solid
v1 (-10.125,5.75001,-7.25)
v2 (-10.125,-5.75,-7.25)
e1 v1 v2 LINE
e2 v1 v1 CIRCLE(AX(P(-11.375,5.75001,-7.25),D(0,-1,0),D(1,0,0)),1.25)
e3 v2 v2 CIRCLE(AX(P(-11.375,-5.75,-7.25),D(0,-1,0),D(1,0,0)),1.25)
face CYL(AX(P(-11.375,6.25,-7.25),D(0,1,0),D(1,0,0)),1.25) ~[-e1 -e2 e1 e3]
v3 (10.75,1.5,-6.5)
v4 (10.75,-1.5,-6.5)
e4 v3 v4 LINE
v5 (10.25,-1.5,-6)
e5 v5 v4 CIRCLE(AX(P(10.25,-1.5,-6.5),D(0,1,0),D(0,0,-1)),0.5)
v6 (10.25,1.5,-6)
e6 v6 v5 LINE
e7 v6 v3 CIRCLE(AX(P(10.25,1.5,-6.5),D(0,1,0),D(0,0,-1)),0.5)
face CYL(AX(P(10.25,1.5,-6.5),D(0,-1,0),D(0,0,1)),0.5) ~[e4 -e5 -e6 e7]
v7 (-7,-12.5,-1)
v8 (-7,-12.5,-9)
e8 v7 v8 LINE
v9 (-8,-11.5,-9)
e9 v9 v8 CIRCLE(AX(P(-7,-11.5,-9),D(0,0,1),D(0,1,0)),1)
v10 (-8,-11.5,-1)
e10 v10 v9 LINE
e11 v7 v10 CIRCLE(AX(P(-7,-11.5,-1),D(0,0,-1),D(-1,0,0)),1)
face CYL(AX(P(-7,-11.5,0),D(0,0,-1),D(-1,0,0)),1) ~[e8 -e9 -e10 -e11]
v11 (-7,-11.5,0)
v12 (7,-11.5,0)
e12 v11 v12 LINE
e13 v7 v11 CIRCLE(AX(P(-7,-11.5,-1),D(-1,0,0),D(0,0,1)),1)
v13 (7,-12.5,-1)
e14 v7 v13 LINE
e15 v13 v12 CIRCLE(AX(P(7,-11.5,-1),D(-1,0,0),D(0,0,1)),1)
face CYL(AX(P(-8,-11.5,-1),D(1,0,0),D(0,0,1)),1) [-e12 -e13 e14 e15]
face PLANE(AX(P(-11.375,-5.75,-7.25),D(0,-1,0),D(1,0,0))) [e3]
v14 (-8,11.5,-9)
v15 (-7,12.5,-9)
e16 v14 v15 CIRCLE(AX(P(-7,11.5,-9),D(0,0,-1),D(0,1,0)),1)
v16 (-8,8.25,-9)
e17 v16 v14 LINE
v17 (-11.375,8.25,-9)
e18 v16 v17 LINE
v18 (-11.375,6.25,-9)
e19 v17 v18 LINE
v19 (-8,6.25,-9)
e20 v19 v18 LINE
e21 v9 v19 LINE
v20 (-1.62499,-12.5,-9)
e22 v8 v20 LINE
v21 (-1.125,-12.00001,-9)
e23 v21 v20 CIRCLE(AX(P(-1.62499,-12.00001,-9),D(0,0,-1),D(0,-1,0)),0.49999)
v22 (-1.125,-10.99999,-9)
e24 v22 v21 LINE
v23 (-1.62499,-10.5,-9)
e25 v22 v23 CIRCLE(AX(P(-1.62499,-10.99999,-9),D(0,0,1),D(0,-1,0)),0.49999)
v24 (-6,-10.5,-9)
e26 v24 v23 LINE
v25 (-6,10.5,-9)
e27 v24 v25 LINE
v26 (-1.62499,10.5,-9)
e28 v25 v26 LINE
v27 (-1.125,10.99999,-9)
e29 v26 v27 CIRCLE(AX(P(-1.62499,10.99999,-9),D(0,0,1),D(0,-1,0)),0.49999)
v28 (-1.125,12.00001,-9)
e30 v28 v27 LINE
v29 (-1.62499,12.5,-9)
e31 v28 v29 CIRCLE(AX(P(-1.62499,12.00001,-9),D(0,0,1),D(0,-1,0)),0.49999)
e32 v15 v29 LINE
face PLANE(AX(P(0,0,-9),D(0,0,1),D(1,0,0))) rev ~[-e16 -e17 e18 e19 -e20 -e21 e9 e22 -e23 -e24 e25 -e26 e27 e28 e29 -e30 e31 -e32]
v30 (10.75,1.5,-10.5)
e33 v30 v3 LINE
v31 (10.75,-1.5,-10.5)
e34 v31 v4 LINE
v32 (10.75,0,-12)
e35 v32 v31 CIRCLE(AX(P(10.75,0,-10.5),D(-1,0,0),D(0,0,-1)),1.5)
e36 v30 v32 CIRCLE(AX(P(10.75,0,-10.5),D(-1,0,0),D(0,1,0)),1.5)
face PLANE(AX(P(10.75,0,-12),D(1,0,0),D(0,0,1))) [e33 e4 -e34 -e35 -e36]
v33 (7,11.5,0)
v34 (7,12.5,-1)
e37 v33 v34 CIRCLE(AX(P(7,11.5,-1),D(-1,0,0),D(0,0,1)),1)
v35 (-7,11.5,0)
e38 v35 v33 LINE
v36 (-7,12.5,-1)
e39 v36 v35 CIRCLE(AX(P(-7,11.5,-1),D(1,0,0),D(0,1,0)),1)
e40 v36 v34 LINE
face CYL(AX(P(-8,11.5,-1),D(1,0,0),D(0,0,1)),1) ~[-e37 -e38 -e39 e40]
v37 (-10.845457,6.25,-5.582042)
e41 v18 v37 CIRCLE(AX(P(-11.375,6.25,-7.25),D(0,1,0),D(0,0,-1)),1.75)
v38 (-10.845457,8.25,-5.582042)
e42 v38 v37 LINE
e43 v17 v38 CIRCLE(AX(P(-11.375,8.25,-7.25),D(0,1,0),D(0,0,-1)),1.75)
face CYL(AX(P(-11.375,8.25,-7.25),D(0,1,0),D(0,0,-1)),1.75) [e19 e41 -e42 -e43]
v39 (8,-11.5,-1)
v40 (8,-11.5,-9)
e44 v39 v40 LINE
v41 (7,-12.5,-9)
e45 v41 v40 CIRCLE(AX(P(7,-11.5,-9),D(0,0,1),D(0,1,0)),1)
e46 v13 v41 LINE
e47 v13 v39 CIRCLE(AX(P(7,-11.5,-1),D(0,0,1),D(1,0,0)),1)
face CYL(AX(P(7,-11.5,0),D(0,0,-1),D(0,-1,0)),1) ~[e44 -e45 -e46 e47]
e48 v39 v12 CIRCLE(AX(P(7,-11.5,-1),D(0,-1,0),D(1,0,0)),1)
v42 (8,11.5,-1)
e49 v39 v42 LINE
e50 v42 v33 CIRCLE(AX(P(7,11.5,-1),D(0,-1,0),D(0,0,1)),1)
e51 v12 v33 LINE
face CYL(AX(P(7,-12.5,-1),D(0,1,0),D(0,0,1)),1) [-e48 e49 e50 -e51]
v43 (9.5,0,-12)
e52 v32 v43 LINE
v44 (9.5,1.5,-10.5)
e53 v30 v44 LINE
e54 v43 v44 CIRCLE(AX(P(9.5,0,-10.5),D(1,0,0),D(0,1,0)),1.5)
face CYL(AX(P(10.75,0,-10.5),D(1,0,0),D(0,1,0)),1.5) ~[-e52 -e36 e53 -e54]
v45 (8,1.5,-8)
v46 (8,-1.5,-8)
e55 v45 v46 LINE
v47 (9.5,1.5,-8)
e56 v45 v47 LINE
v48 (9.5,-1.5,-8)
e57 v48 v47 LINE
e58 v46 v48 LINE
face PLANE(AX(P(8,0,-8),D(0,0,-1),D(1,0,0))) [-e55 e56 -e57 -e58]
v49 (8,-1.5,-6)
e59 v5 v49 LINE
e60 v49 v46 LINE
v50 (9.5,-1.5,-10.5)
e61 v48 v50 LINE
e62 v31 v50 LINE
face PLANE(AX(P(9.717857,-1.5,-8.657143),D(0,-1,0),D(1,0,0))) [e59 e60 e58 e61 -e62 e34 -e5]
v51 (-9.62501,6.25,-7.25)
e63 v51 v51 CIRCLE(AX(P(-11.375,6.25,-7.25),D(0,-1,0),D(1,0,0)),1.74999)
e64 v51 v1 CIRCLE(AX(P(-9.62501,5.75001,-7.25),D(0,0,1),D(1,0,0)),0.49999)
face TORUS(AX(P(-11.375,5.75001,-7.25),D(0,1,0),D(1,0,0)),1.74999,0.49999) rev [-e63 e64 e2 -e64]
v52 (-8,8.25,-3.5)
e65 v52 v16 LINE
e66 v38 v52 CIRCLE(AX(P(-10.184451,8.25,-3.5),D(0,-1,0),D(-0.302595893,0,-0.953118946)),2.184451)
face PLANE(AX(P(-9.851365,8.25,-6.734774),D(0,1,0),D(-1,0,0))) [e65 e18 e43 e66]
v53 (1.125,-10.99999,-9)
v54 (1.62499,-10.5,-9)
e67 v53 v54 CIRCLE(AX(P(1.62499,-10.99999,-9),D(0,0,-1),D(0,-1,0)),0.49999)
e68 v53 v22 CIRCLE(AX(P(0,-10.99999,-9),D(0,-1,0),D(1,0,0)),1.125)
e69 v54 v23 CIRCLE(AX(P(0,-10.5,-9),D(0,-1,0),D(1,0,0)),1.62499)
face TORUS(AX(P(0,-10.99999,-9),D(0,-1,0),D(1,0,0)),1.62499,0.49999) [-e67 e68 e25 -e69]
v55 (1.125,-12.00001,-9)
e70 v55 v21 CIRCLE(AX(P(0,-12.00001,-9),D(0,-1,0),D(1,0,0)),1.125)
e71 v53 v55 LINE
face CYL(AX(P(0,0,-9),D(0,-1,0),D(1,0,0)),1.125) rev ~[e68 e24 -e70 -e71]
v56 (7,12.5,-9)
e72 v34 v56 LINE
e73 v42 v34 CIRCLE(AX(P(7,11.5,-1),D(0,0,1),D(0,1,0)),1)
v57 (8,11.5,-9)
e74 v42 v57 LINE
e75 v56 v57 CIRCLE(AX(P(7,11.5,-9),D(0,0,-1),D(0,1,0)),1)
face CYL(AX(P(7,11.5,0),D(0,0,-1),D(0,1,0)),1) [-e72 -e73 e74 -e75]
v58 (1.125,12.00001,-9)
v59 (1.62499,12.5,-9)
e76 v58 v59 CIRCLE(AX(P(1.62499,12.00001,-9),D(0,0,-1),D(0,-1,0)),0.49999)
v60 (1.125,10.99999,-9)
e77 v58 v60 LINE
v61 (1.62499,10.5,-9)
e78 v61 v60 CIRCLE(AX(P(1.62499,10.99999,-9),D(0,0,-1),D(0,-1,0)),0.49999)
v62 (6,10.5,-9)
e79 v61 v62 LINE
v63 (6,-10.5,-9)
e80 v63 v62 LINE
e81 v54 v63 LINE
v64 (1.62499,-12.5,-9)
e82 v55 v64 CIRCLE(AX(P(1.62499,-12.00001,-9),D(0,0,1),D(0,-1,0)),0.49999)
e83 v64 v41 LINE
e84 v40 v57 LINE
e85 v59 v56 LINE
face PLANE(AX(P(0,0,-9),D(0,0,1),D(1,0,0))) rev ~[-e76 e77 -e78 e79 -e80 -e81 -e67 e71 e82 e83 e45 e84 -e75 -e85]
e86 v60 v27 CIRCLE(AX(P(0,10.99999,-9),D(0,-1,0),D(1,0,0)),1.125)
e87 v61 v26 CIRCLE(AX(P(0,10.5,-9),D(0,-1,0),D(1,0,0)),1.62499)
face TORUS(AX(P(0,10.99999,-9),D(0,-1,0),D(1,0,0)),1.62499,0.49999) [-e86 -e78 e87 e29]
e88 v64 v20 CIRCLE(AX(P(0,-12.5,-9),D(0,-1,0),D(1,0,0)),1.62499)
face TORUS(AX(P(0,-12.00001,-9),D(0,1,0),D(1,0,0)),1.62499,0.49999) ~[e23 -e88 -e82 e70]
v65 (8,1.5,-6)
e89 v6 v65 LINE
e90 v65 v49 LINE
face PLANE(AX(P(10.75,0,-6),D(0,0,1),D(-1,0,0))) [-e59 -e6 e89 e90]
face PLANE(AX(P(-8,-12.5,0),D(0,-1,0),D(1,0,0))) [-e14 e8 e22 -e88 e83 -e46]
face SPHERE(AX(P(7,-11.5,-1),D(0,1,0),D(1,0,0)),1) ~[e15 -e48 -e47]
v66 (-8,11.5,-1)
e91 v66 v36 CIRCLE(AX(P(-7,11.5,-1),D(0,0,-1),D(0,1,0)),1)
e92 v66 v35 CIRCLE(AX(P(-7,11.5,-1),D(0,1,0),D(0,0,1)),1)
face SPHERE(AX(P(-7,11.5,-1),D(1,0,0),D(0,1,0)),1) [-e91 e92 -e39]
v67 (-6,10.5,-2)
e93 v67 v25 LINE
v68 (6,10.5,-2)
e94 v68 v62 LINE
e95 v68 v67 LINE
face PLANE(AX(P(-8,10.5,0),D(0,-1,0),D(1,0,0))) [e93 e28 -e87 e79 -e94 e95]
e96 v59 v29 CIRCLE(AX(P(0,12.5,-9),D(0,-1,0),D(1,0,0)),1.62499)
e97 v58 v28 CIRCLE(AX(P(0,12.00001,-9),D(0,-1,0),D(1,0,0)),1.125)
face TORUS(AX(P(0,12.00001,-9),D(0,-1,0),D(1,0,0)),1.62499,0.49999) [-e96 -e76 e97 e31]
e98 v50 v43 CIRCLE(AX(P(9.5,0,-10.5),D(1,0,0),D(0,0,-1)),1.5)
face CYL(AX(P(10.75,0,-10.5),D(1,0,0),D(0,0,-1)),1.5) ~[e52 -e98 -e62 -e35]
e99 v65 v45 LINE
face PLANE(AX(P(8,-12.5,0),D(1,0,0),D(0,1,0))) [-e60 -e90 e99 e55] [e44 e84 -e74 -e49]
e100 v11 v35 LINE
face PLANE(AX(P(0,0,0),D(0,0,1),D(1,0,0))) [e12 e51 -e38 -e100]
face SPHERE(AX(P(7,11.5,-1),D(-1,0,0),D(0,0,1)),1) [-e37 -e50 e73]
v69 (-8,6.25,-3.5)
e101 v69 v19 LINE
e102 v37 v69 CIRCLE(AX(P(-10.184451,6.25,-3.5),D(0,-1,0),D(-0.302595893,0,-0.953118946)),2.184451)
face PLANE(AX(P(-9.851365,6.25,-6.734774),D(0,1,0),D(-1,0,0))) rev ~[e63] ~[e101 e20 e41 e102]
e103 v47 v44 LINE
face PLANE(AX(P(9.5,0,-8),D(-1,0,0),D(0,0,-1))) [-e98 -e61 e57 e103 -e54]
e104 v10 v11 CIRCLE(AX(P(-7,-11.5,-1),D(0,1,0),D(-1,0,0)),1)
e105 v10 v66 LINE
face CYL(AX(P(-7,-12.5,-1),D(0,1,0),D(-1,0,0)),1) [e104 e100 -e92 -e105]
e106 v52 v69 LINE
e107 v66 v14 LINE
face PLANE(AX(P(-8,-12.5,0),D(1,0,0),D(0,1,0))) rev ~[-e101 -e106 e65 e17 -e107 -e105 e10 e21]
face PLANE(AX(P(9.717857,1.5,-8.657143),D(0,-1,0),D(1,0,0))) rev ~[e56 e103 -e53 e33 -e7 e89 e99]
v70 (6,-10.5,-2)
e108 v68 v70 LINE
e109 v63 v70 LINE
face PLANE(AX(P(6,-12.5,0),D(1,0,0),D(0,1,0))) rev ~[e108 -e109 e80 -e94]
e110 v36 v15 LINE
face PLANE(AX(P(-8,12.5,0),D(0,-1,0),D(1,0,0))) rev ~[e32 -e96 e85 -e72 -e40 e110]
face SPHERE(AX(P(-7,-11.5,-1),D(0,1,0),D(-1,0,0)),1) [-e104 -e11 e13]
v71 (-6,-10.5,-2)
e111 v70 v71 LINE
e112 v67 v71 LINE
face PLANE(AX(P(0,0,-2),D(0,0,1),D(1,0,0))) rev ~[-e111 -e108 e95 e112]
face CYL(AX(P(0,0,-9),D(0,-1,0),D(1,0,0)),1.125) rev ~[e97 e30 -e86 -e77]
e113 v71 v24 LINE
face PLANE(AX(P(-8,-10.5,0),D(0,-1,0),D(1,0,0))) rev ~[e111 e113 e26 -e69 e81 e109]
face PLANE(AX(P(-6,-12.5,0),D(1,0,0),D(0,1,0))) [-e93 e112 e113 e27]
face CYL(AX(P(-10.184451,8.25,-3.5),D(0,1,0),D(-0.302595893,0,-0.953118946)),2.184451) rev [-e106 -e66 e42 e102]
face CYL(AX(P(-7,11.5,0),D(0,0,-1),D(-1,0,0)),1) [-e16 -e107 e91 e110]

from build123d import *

# Parameters (mm, degrees)
F0_W      = 16
F0_H      = 25
F1_DEPTH  = 9
F2_T      = -2
F5_DEPTH  = 2
F6_R      = 1.25
F7_DEPTH  = 12
F8_R      = 1
F9_R      = 1.125
F10_DEPTH = 12.5
F12_DEPTH = 1.5
F14_DEPTH = 5
F15_R     = 0.5
F16_R     = 0.49999


# Not quite as in the source:
# - a fillet or chamfer is up to 0.001 mm smaller than in the source, because OpenCascade refuses the exact size


with BuildPart() as f1:
    # F0 (on Top) → F1 (new body)
    with BuildSketch(Plane.XY):
        Rectangle(F0_W, F0_H)
    extrude(amount=-F1_DEPTH)

    # F2
    f2_openings = [f1.faces().sort_by_distance(p)[0] for p in [
        (0, 0, -9),
    ]]
    offset(amount=F2_T, openings=f2_openings)

    # F4 (on offset) → F5 (join)
    with BuildSketch(Plane(origin=(0, 8.25, 0), x_dir=(-1, 0, 0), z_dir=(0, 1, 0))):
        with BuildLine():
            Line((8, -9), (11.375, -9))
            ThreePointArc((11.375, -9), (13.1043679152, -6.9820697596), (10.8454571871, -5.5820418442))
            ThreePointArc((10.8454571871, -5.5820418442), (8.8945109421, -5.2629183791), (8, -3.5))
            Line((8, -3.5), (8, -9))
        make_face()
    extrude(amount=-F5_DEPTH)

    # F6 (on face) → F7 (join)
    with BuildSketch(Plane.XZ.offset(-6.25)):
        with Locations((-11.375, -7.25)):
            Circle(F6_R)
    extrude(amount=F7_DEPTH)

    # F8
    f8_edges = [f1.edges().sort_by_distance(p)[0] for p in [
        (0, 12.5, 0),
        (-8, 12.5, -4.5),
        (-8, 0, 0),
        (-8, -12.5, -4.5),
        (8, 0, 0),
        (8, 12.5, -4.5),
        (8, -12.5, -4.5),
        (0, -12.5, 0),
    ]]
    fillet(f8_edges, radius=F8_R)

    # F9 (on Front) → F10 (cut, symmetric)
    with BuildSketch(Plane.XZ):
        with Locations((0, -9)):
            Circle(F9_R)
    extrude(amount=F10_DEPTH, both=True, mode=Mode.SUBTRACT)

    # F11 (on Front) → F12 (join, symmetric)
    with BuildSketch(Plane.XZ):
        Polygon((10.75, -12), (10.75, -6), (8, -6), (8, -8), (9.5, -8), (9.5, -12), align=None)
    extrude(amount=F12_DEPTH, both=True)

    # F13 (on face) → F14 (cut)
    with BuildSketch(Plane.YZ.offset(10.75)):
        with BuildLine():
            ThreePointArc((1.5, -10.5), (1.0606601718, -11.5606601718), (0, -12))
            Line((0, -12), (1.5, -12))
            Line((1.5, -12), (1.5, -10.5))
        make_face()
        with BuildLine():
            ThreePointArc((0, -12), (-1.0606601718, -11.5606601718), (-1.5, -10.5))
            Line((-1.5, -10.5), (-1.5, -12))
            Line((-1.5, -12), (0, -12))
        make_face()
    extrude(amount=-F14_DEPTH, mode=Mode.SUBTRACT)

    # F15
    f15_edges = [f1.edges().sort_by_distance(p)[0] for p in [
        (10.75, 0, -6),
    ]]
    fillet(f15_edges, radius=F15_R)

    # F16 (radius 0.5 in the source; OpenCascade refuses exactly that, so slightly less here)
    f16_edges = [f1.edges().sort_by_distance(p)[0] for p in [
        (-12.625, 6.25, -7.25),
        (0, -12.5, -7.875),
        (0, -10.5, -7.875),
        (0, 12.5, -7.875),
        (0, 10.5, -7.875),
    ]]
    fillet(f16_edges, radius=F16_R)


solid = f1.part
